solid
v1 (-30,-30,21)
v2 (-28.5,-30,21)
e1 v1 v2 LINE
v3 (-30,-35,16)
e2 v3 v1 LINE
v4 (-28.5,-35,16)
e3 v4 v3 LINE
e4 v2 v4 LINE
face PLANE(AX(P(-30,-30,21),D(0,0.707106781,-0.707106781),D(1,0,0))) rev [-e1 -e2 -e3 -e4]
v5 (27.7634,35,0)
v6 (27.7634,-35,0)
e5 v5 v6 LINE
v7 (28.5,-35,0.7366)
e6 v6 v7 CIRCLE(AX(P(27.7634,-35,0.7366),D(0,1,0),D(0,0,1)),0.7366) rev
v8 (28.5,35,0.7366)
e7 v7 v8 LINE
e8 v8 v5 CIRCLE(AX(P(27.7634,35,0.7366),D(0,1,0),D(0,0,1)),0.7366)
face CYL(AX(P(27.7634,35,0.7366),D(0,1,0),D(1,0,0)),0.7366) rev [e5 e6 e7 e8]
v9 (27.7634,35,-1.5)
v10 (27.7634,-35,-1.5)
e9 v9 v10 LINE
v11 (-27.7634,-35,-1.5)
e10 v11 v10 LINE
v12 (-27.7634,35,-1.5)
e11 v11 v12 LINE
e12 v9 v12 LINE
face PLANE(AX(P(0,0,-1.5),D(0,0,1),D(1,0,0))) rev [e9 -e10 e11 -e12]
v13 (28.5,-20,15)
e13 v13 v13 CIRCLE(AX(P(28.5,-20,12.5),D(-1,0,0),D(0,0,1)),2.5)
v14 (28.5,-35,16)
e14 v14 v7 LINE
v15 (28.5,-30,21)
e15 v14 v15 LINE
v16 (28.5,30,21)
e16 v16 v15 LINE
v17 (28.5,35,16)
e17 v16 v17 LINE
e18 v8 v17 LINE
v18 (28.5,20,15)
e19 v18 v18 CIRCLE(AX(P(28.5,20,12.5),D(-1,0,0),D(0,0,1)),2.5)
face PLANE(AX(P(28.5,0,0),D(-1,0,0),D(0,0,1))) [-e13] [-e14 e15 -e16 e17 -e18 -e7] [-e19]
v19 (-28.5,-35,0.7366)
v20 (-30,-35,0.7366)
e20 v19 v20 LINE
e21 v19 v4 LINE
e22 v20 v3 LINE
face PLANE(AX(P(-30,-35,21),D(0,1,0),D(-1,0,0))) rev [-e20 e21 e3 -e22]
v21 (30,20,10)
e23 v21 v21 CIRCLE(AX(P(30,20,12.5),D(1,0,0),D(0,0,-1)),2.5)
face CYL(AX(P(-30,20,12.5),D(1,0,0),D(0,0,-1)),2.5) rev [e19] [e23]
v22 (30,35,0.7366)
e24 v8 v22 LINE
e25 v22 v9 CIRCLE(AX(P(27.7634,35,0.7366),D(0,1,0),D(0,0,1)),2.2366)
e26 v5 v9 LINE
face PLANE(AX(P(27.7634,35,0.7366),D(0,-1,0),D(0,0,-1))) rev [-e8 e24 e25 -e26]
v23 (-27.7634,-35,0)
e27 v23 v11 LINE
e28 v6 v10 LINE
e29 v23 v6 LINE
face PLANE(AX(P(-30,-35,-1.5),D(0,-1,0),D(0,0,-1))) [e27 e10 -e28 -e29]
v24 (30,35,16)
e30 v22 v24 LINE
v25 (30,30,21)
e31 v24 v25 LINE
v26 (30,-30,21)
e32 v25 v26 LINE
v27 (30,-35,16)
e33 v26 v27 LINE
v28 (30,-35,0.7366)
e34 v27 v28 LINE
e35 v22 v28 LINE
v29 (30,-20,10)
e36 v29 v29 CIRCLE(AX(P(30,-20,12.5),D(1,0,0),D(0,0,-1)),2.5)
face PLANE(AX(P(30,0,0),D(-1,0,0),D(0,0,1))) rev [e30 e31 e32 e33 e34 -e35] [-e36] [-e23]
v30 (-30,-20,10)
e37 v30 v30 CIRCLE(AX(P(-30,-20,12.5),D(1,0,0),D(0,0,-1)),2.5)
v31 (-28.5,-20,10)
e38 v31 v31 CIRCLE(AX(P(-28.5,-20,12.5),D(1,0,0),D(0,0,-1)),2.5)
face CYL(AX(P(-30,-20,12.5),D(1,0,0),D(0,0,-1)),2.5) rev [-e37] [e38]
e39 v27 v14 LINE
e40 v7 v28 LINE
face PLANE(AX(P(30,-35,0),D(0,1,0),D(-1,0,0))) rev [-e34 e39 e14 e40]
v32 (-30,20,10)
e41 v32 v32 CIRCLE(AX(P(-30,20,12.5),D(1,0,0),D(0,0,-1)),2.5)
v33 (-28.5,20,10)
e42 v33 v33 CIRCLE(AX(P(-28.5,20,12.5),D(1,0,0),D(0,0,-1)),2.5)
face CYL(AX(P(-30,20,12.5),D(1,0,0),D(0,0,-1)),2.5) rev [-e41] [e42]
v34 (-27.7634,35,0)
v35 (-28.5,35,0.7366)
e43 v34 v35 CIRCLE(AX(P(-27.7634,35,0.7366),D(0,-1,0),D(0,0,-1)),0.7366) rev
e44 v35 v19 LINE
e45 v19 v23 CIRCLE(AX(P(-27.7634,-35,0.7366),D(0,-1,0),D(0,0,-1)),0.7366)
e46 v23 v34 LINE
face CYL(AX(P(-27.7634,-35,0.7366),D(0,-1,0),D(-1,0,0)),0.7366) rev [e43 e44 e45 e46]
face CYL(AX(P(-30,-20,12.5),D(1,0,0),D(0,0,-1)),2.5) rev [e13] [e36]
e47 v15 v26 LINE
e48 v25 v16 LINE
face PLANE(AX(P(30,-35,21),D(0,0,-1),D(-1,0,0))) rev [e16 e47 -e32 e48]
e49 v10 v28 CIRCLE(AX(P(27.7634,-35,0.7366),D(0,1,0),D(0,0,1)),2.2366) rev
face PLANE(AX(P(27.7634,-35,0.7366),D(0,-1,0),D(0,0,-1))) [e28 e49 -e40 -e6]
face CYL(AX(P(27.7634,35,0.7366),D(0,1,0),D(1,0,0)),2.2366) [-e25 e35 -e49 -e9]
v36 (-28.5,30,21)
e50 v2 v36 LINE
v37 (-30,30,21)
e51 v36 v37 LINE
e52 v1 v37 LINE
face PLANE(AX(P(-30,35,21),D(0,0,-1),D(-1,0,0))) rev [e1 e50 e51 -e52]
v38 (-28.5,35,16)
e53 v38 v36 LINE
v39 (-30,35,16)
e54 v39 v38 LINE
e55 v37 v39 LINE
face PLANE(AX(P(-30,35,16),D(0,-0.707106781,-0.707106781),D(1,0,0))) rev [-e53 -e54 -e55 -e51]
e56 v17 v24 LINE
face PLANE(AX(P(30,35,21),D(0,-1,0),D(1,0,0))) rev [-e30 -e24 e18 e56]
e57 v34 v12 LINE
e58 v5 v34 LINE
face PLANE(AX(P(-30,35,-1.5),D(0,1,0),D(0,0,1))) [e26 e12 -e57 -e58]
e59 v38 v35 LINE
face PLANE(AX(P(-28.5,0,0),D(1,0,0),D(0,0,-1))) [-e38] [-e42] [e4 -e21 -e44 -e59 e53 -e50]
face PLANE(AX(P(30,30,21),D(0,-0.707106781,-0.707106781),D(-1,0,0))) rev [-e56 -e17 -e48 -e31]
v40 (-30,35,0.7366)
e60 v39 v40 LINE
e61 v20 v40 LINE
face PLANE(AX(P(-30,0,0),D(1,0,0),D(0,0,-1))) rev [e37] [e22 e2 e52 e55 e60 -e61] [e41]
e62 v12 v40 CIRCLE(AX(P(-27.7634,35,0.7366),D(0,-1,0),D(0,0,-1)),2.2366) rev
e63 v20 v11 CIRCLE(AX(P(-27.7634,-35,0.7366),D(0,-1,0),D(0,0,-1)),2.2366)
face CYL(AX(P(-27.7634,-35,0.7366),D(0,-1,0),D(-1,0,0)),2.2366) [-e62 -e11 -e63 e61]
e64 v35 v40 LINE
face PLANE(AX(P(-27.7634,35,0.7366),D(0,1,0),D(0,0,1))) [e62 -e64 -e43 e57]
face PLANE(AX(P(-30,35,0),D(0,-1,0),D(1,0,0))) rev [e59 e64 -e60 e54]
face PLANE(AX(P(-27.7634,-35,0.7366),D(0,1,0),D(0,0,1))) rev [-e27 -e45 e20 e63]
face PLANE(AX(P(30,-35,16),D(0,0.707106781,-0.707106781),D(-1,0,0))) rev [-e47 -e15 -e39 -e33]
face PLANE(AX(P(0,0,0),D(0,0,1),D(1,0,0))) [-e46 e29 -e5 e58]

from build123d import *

# Parameters (mm, degrees)
CROQUIS1_W                         = 60
CROQUIS1_H                         = 70
BRIDA_BASE1_DEPTH                  = 1.5
BRIDA_DE_ARISTA1_STRIP_W           = 7.4732
BRIDA_DE_ARISTA1_STRIP_H           = 1.5
BRIDA_DE_ARISTA1_STRIP_CUT_DEPTH   = 70
BRIDA_DE_ARISTA1_STRIP_2_W         = 7.4732
BRIDA_DE_ARISTA1_STRIP_2_H         = 1.5
BRIDA_DE_ARISTA1_STRIP_CUT_2_DEPTH = 70
BRIDA_DE_ARISTA1_DEPTH             = 70
BRIDA_DE_ARISTA1_BEND_DEPTH        = 70
ROMPER_START                       = 36.062445841
ROMPER_ESQUINA1_OUTLINE_W          = 64
ROMPER_ESQUINA1_OUTLINE_H          = 51.062445841
ROMPER_ESQUINA1_DEPTH              = 3.535533905
ROMPER_START_2                     = -13.435028843
ROMPER_ESQUINA1_2_OUTLINE_W        = 64
ROMPER_ESQUINA1_2_OUTLINE_H        = 3.937554159
ROMPER_ESQUINA1_2_DEPTH            = 7.071067812
CROQUIS13_R                        = 2.5
CORTAR_EXTRUIR1_DEPTH              = 73.567210226


# Read off the part's stored shape, not the designer's step: Romper esquina1
# Sheet-metal steps are written as plain solids
with BuildPart() as part:
    # Croquis1 → Brida base1 (new body)
    with BuildSketch(Plane.XY):
        Rectangle(CROQUIS1_W, CROQUIS1_H)
    extrude(amount=-BRIDA_BASE1_DEPTH)

    # Brida de arista1 strip (across the edge) → Brida de arista1 strip cut (cut)
    with BuildSketch(Plane(origin=(30, -35, 0), x_dir=(-1, 0, 0), z_dir=(0, 1, 0))):
        with Locations((-1.5, -0.75)):
            Rectangle(BRIDA_DE_ARISTA1_STRIP_W, BRIDA_DE_ARISTA1_STRIP_H)
    extrude(amount=BRIDA_DE_ARISTA1_STRIP_CUT_DEPTH, mode=Mode.SUBTRACT)

    # Brida de arista1 strip 2 (across the edge) → Brida de arista1 strip cut 2 (cut)
    with BuildSketch(Plane(origin=(-30, 35, 0), x_dir=(1, 0, 0), z_dir=(0, -1, 0))):
        with Locations((-1.5, -0.75)):
            Rectangle(BRIDA_DE_ARISTA1_STRIP_2_W, BRIDA_DE_ARISTA1_STRIP_2_H)
    extrude(amount=BRIDA_DE_ARISTA1_STRIP_CUT_2_DEPTH, mode=Mode.SUBTRACT)

    # Brida de arista1 section (across the edge) → Brida de arista1 (add)
    with BuildSketch(Plane(origin=(30, -35, 0), x_dir=(-1, 0, 0), z_dir=(0, 1, 0))):
        with BuildLine():
            Line((0, 0.7366), (0, 21))
            Line((0, 21), (1.5, 21))
            Line((1.5, 21), (1.5, 0.7366))
            ThreePointArc((1.5, 0.7366), (1.715745145, 0.215745145), (2.2366, 0))
            Line((2.2366, 0), (2.2366, -1.5))
            ThreePointArc((2.2366, -1.5), (0.655084973, -0.844915027), (0, 0.7366))
        make_face()
    extrude(amount=BRIDA_DE_ARISTA1_DEPTH)

    # Brida de arista1 section 2 (across the edge) → Brida de arista1 bend (add)
    with BuildSketch(Plane(origin=(-30, 35, 0), x_dir=(1, 0, 0), z_dir=(0, -1, 0))):
        with BuildLine():
            Line((0, 0.7366), (0, 21))
            Line((0, 21), (1.5, 21))
            Line((1.5, 21), (1.5, 0.7366))
            ThreePointArc((1.5, 0.7366), (1.715745145, 0.215745145), (2.2366, 0))
            Line((2.2366, 0), (2.2366, -1.5))
            ThreePointArc((2.2366, -1.5), (0.655084973, -0.844915027), (0, 0.7366))
        make_face()
    extrude(amount=BRIDA_DE_ARISTA1_BEND_DEPTH)

    # Romper esquina1 outline → Romper esquina1 (cut)
    with BuildSketch(Plane(origin=(0, 0, 0), x_dir=(1, 0, 0), z_dir=(0, 0.707106781186548, 0.707106781186547)).offset(ROMPER_START)):
        with Locations((0, -10.53122292)):
            Rectangle(ROMPER_ESQUINA1_OUTLINE_W, ROMPER_ESQUINA1_OUTLINE_H)
    extrude(amount=ROMPER_ESQUINA1_DEPTH, mode=Mode.SUBTRACT)

    # Romper esquina1 2 outline → Romper esquina1 2 (cut)
    with BuildSketch(Plane(origin=(0, 0, 0), x_dir=(1, 0, 0), z_dir=(0, 0.707106781186548, 0.707106781186547)).offset(ROMPER_START_2)):
        with Locations((0, -38.03122292)):
            Rectangle(ROMPER_ESQUINA1_2_OUTLINE_W, ROMPER_ESQUINA1_2_OUTLINE_H)
    extrude(amount=ROMPER_ESQUINA1_2_DEPTH, mode=Mode.SUBTRACT)

    # Croquis13 → Cortar-Extruir1 (cut, through all)
    with BuildSketch(Plane(origin=(30, 0, 0), x_dir=(0, 0, -1), z_dir=(1, 0, 0))):
        with Locations((-12.5, 20)):
            Circle(CROQUIS13_R)
        with Locations((-12.5, -20)):
            Circle(CROQUIS13_R)
    extrude(amount=-CORTAR_EXTRUIR1_DEPTH, mode=Mode.SUBTRACT)


solid = part.part
